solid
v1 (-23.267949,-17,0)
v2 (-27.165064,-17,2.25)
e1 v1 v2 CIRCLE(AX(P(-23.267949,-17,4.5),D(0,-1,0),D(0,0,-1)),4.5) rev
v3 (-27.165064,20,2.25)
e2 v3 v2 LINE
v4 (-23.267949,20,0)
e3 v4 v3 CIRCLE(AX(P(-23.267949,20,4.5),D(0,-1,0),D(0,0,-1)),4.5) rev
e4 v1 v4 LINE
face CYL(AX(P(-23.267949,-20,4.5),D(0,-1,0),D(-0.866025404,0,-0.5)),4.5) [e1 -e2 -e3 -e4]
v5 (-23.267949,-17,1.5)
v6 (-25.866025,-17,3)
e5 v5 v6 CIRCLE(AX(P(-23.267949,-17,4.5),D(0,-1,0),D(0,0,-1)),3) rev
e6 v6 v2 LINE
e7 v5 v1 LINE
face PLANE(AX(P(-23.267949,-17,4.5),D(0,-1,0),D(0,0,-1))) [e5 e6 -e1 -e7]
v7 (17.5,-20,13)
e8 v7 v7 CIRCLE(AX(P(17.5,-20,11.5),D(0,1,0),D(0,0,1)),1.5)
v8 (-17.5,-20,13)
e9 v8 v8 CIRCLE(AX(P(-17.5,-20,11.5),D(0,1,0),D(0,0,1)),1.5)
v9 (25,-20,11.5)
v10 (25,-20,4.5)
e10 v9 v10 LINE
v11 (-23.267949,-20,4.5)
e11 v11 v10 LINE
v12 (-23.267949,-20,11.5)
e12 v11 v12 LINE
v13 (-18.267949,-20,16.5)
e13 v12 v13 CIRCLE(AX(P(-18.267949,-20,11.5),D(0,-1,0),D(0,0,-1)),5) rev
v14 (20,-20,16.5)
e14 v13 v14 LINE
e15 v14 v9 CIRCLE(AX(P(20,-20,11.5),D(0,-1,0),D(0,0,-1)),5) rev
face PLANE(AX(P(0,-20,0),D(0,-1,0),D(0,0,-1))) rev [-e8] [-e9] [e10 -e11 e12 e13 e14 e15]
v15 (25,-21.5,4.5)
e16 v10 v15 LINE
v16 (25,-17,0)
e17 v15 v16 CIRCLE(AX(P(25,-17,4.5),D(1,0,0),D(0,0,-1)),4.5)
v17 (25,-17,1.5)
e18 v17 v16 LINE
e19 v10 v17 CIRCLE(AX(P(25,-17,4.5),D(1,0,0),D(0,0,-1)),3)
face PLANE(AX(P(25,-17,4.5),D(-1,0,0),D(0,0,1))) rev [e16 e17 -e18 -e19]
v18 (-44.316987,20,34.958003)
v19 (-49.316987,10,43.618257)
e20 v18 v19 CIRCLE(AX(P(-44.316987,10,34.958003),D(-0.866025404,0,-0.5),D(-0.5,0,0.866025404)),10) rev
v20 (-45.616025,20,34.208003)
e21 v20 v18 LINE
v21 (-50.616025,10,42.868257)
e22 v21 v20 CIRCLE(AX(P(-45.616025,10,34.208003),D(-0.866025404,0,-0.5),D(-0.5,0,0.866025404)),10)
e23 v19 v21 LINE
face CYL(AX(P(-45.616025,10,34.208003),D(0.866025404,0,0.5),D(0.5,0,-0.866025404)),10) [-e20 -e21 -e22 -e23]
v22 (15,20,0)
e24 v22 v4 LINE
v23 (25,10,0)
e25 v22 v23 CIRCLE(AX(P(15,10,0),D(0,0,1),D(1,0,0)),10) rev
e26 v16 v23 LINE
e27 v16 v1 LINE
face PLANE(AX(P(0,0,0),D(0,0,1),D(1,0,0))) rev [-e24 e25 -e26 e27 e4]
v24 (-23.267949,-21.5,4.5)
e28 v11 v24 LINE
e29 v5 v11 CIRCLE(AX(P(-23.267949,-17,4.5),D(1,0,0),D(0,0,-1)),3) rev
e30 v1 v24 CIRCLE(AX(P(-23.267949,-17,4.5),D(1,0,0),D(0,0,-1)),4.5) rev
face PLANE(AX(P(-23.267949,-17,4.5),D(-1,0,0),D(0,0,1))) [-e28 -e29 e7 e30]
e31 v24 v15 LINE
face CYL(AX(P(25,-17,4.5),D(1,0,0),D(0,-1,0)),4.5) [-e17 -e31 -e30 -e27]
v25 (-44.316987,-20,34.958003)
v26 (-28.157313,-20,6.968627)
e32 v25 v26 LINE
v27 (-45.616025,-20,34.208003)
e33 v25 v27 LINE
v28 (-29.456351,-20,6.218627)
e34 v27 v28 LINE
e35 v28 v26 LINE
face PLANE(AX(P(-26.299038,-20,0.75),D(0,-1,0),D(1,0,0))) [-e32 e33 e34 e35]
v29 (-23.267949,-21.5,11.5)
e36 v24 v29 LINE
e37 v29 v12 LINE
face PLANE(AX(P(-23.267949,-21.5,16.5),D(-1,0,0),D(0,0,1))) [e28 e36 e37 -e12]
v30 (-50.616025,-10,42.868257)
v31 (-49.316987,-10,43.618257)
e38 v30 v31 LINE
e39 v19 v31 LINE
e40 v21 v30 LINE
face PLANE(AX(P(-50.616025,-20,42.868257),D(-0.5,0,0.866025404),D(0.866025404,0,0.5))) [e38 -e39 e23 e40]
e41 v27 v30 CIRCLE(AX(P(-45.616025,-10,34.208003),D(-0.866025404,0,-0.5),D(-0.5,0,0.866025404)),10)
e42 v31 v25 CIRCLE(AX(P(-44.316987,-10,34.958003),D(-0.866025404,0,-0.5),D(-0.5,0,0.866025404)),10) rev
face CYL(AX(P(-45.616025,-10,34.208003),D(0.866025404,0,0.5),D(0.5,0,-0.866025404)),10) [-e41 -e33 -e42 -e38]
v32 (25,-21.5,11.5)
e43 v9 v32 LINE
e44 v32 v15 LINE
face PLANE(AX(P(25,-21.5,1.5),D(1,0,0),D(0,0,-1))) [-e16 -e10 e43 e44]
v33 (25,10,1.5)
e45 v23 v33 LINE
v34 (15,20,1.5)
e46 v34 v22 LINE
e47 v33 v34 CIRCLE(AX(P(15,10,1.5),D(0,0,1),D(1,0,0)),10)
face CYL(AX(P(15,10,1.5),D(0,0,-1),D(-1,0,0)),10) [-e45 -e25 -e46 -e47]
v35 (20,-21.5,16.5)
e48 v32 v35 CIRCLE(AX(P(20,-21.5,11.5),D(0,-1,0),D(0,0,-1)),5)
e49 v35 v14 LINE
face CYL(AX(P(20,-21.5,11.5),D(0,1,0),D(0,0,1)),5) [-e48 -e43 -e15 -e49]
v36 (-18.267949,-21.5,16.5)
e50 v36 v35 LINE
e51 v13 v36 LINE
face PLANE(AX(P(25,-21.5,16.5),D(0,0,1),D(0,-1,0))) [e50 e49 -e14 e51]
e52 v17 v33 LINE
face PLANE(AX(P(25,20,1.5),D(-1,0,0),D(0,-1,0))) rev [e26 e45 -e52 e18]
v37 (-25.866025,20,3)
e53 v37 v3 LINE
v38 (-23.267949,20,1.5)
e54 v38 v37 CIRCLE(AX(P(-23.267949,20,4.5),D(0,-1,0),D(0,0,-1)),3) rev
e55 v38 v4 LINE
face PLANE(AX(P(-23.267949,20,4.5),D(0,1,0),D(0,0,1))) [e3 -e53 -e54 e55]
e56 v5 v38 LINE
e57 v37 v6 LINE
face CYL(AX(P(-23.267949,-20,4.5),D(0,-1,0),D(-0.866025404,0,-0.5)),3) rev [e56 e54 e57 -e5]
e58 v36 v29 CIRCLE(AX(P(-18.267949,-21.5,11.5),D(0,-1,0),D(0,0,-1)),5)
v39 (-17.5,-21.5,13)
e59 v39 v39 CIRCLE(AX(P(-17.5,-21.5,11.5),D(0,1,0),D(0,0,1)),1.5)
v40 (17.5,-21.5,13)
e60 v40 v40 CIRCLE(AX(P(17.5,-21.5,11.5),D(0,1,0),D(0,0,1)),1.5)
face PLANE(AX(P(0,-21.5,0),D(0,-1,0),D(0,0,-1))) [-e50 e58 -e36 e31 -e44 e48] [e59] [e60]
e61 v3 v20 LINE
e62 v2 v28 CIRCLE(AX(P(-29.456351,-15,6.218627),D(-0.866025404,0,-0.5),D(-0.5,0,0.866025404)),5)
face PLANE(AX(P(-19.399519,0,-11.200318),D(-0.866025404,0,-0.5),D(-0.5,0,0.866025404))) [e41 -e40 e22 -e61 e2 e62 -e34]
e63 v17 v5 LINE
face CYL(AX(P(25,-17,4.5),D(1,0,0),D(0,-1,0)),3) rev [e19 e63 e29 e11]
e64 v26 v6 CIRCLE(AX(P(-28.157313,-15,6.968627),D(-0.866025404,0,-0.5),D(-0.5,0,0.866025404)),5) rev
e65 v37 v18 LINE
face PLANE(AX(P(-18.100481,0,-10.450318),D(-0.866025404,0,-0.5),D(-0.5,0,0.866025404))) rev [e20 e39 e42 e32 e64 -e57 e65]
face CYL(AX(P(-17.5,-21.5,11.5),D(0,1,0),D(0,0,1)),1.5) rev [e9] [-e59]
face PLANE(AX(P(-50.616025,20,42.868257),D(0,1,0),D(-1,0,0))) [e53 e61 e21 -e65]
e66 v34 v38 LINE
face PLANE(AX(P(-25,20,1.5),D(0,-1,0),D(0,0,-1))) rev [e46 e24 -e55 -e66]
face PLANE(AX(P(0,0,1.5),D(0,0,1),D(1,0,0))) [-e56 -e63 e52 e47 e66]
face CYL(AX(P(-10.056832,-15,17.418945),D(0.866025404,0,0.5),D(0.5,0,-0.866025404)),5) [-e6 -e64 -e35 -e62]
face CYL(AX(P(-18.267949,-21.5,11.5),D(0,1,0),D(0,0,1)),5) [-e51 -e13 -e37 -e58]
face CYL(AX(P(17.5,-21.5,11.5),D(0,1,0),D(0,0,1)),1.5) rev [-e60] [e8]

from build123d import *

# Parameters (mm, degrees)
SKETCH1_W                    = 50
SKETCH1_H                    = 40
BASE_FLANGE1_DEPTH           = 1.5
EDGE_FLANGE1_STRIP_CUT_DEPTH = 40
EDGE_FLANGE1_DEPTH           = 40
EDGE_FLANGE2_START           = -25.866025404
EDGE_FLANGE2_DEPTH           = 2.598076212
EDGE_FLANGE2_START_2         = -23.267949192
EDGE_FLANGE2_2_DEPTH         = 48.267949192
EDGE_FLANGE2_3_DEPTH         = 50.866025404
EDGE_FLANGE2_START_3         = -21
EDGE_FLANGE2_4_DEPTH         = 4
SKETCH12_R                   = 1.5
CUT_EXTRUDE1_DEPTH           = 10
FILLET1_R                    = 10
FILLET2_R                    = 5


with BuildPart() as part:
    # Base-Flange1: sheet metal written as solids
    # Sketch1 → Base-Flange1 (new body)
    with BuildSketch(Plane.XY):
        Rectangle(SKETCH1_W, SKETCH1_H)
    extrude(amount=BASE_FLANGE1_DEPTH)

    # Edge-Flange1: sheet metal written as solids
    # Edge-Flange1 strip (on a plane across the edge) → Edge-Flange1 strip cut (cut)
    with BuildSketch(Plane(origin=(-25, 20, 1.5), x_dir=(0.8660254037844364, 0, 0.5000000000000041), z_dir=(0, -1, 0))):
        Polygon((-9.642304845, 3.834936491), (0.75, -2.165063509), (1.5, -0.866025404), (-8.892304845, 5.133974596), align=None)
    extrude(amount=EDGE_FLANGE1_STRIP_CUT_DEPTH, mode=Mode.SUBTRACT)

    # Edge-Flange1 section (on a plane across the edge) → Edge-Flange1 (add)
    with BuildSketch(Plane(origin=(-25, 20, 1.5), x_dir=(0.8660254037844364, 0, 0.5000000000000041), z_dir=(0, -1, 0))):
        with BuildLine():
            Line((-1.5, 1.732050808), (-1.5, 48.633974596))
            Line((-1.5, 48.633974596), (0, 48.633974596))
            Line((0, 48.633974596), (0, 1.732050808))
            ThreePointArc((0, 1.732050808), (0.401923789, 0.232050808), (1.5, -0.866025404))
            Line((1.5, -0.866025404), (0.75, -2.165063509))
            ThreePointArc((0.75, -2.165063509), (-0.897114317, -0.517949192), (-1.5, 1.732050808))
        make_face()
    extrude(amount=EDGE_FLANGE1_DEPTH)

    # Edge-Flange2: read off the stored shape, not the designer's step
    # Edge-Flange2 outline → Edge-Flange2 (cut)
    with BuildSketch(Plane.YZ.offset(EDGE_FLANGE2_START)):
        with BuildLine():
            Line((-17, 0), (-17, 1.5))
            ThreePointArc((-17, 1.5), (-19.121320344, 2.378679656), (-20, 4.5))
            Line((-20, 4.5), (-20, 16.5))
            Line((-20, 16.5), (-21.5, 16.5))
            Line((-21.5, 16.5), (-21.5, 4.5))
            ThreePointArc((-21.5, 4.5), (-21.107919181, 2.662882693), (-20, 1.145898034))
            ThreePointArc((-20, 1.145898034), (-18.605699404, 0.296224385), (-17, 0))
        make_face()
    extrude(amount=EDGE_FLANGE2_DEPTH, mode=Mode.SUBTRACT)

    # Edge-Flange2 2 outline → Edge-Flange2 2 (add)
    with BuildSketch(Plane.YZ.offset(EDGE_FLANGE2_START_2)):
        with BuildLine():
            Line((-17, 0), (-17, 1.5))
            ThreePointArc((-17, 1.5), (-19.121320344, 2.378679656), (-20, 4.5))
            Line((-20, 4.5), (-20, 16.5))
            Line((-20, 16.5), (-21.5, 16.5))
            Line((-21.5, 16.5), (-21.5, 4.5))
            ThreePointArc((-21.5, 4.5), (-21.107919181, 2.662882693), (-20, 1.145898034))
            ThreePointArc((-20, 1.145898034), (-18.605699404, 0.296224385), (-17, 0))
        make_face()
    extrude(amount=EDGE_FLANGE2_2_DEPTH)

    # Edge-Flange2 3 outline → Edge-Flange2 3 (cut)
    with BuildSketch(Plane.YZ.offset(EDGE_FLANGE2_START)):
        with BuildLine():
            ThreePointArc((-17, 0), (-18.605699404, 0.296224385), (-20, 1.145898034))
            Line((-20, 1.145898034), (-20, 0))
            Line((-20, 0), (-17, 0))
        make_face()
    extrude(amount=EDGE_FLANGE2_3_DEPTH, mode=Mode.SUBTRACT)

    # Edge-Flange2 4 outline → Edge-Flange2 4 (cut)
    with BuildSketch(Plane(origin=(0, 0, 0), x_dir=(1, 0, 0), z_dir=(0, 1, 0)).offset(EDGE_FLANGE2_START_3)):
        with BuildLine():
            ThreePointArc((-25.866025404, -3), (-24.767949192, -1.901923789), (-23.267949192, -1.5))
            Line((-23.267949192, -1.5), (-23.267949192, 0))
            ThreePointArc((-23.267949192, 0), (-25.517949192, -0.602885683), (-27.165063509, -2.25))
            Line((-27.165063509, -2.25), (-25.866025404, -3))
        make_face()
    extrude(amount=EDGE_FLANGE2_4_DEPTH, mode=Mode.SUBTRACT)

    # Sketch12 → Cut-Extrude1 (cut)
    with BuildSketch(Plane(origin=(0, -20, 0), x_dir=(1, 0, 0), z_dir=(0, 1, 0))):
        with Locations(Location((-17.5, -11.5, 0), (0, 0, 270))):
            Circle(SKETCH12_R)
        with Locations(Location((17.5, -11.5, 0), (0, 0, 270))):
            Circle(SKETCH12_R)
    extrude(amount=-CUT_EXTRUDE1_DEPTH, mode=Mode.SUBTRACT)

    # Fillet1
    fillet1_edges = [part.edges().sort_by_distance(p)[0] for p in [
        (-49.966506351, 20, 43.243257487),
        (-49.966506351, -20, 43.243257487),
        (25, 20, 0.75),
    ]]
    fillet(fillet1_edges, radius=FILLET1_R)

    # Fillet2
    # the kernel refuses this fillet: 5 mm, written as the material it takes off along each edge
    with BuildSketch(Plane(origin=(-37.086630924, -20, -3.478219621), x_dir=(-0.5000000001953341, 0, 0.8660254036716625), z_dir=(0.8660254036716625, 0, 0.5000000001953341))) as fillet2_piece_1:
        with BuildLine():
            CenterArc((4.582575695, -5), FILLET2_R, 90, 66.421821522)
            Line((0, -3), (0, 0))
            Line((0, 0), (4.582575695, 0))
        make_face()
    extrude(amount=24.412878474, mode=Mode.SUBTRACT)
    with BuildSketch(Plane(origin=(-23.267949192, -7.5, 16.5), x_dir=(1, 0, 0), z_dir=(0, -1, 0)), Plane(origin=(25, -7.5, 16.5), x_dir=(0, 0, -1), z_dir=(0, -1, 0))) as fillet2_piece_2:
        with BuildLine():
            CenterArc((FILLET2_R, -FILLET2_R), FILLET2_R, 90, 90)
            Line((0, -FILLET2_R), (0, 0))
            Line((0, 0), (FILLET2_R, 0))
        make_face()
    extrude(amount=26.5, mode=Mode.SUBTRACT)


solid = part.part
